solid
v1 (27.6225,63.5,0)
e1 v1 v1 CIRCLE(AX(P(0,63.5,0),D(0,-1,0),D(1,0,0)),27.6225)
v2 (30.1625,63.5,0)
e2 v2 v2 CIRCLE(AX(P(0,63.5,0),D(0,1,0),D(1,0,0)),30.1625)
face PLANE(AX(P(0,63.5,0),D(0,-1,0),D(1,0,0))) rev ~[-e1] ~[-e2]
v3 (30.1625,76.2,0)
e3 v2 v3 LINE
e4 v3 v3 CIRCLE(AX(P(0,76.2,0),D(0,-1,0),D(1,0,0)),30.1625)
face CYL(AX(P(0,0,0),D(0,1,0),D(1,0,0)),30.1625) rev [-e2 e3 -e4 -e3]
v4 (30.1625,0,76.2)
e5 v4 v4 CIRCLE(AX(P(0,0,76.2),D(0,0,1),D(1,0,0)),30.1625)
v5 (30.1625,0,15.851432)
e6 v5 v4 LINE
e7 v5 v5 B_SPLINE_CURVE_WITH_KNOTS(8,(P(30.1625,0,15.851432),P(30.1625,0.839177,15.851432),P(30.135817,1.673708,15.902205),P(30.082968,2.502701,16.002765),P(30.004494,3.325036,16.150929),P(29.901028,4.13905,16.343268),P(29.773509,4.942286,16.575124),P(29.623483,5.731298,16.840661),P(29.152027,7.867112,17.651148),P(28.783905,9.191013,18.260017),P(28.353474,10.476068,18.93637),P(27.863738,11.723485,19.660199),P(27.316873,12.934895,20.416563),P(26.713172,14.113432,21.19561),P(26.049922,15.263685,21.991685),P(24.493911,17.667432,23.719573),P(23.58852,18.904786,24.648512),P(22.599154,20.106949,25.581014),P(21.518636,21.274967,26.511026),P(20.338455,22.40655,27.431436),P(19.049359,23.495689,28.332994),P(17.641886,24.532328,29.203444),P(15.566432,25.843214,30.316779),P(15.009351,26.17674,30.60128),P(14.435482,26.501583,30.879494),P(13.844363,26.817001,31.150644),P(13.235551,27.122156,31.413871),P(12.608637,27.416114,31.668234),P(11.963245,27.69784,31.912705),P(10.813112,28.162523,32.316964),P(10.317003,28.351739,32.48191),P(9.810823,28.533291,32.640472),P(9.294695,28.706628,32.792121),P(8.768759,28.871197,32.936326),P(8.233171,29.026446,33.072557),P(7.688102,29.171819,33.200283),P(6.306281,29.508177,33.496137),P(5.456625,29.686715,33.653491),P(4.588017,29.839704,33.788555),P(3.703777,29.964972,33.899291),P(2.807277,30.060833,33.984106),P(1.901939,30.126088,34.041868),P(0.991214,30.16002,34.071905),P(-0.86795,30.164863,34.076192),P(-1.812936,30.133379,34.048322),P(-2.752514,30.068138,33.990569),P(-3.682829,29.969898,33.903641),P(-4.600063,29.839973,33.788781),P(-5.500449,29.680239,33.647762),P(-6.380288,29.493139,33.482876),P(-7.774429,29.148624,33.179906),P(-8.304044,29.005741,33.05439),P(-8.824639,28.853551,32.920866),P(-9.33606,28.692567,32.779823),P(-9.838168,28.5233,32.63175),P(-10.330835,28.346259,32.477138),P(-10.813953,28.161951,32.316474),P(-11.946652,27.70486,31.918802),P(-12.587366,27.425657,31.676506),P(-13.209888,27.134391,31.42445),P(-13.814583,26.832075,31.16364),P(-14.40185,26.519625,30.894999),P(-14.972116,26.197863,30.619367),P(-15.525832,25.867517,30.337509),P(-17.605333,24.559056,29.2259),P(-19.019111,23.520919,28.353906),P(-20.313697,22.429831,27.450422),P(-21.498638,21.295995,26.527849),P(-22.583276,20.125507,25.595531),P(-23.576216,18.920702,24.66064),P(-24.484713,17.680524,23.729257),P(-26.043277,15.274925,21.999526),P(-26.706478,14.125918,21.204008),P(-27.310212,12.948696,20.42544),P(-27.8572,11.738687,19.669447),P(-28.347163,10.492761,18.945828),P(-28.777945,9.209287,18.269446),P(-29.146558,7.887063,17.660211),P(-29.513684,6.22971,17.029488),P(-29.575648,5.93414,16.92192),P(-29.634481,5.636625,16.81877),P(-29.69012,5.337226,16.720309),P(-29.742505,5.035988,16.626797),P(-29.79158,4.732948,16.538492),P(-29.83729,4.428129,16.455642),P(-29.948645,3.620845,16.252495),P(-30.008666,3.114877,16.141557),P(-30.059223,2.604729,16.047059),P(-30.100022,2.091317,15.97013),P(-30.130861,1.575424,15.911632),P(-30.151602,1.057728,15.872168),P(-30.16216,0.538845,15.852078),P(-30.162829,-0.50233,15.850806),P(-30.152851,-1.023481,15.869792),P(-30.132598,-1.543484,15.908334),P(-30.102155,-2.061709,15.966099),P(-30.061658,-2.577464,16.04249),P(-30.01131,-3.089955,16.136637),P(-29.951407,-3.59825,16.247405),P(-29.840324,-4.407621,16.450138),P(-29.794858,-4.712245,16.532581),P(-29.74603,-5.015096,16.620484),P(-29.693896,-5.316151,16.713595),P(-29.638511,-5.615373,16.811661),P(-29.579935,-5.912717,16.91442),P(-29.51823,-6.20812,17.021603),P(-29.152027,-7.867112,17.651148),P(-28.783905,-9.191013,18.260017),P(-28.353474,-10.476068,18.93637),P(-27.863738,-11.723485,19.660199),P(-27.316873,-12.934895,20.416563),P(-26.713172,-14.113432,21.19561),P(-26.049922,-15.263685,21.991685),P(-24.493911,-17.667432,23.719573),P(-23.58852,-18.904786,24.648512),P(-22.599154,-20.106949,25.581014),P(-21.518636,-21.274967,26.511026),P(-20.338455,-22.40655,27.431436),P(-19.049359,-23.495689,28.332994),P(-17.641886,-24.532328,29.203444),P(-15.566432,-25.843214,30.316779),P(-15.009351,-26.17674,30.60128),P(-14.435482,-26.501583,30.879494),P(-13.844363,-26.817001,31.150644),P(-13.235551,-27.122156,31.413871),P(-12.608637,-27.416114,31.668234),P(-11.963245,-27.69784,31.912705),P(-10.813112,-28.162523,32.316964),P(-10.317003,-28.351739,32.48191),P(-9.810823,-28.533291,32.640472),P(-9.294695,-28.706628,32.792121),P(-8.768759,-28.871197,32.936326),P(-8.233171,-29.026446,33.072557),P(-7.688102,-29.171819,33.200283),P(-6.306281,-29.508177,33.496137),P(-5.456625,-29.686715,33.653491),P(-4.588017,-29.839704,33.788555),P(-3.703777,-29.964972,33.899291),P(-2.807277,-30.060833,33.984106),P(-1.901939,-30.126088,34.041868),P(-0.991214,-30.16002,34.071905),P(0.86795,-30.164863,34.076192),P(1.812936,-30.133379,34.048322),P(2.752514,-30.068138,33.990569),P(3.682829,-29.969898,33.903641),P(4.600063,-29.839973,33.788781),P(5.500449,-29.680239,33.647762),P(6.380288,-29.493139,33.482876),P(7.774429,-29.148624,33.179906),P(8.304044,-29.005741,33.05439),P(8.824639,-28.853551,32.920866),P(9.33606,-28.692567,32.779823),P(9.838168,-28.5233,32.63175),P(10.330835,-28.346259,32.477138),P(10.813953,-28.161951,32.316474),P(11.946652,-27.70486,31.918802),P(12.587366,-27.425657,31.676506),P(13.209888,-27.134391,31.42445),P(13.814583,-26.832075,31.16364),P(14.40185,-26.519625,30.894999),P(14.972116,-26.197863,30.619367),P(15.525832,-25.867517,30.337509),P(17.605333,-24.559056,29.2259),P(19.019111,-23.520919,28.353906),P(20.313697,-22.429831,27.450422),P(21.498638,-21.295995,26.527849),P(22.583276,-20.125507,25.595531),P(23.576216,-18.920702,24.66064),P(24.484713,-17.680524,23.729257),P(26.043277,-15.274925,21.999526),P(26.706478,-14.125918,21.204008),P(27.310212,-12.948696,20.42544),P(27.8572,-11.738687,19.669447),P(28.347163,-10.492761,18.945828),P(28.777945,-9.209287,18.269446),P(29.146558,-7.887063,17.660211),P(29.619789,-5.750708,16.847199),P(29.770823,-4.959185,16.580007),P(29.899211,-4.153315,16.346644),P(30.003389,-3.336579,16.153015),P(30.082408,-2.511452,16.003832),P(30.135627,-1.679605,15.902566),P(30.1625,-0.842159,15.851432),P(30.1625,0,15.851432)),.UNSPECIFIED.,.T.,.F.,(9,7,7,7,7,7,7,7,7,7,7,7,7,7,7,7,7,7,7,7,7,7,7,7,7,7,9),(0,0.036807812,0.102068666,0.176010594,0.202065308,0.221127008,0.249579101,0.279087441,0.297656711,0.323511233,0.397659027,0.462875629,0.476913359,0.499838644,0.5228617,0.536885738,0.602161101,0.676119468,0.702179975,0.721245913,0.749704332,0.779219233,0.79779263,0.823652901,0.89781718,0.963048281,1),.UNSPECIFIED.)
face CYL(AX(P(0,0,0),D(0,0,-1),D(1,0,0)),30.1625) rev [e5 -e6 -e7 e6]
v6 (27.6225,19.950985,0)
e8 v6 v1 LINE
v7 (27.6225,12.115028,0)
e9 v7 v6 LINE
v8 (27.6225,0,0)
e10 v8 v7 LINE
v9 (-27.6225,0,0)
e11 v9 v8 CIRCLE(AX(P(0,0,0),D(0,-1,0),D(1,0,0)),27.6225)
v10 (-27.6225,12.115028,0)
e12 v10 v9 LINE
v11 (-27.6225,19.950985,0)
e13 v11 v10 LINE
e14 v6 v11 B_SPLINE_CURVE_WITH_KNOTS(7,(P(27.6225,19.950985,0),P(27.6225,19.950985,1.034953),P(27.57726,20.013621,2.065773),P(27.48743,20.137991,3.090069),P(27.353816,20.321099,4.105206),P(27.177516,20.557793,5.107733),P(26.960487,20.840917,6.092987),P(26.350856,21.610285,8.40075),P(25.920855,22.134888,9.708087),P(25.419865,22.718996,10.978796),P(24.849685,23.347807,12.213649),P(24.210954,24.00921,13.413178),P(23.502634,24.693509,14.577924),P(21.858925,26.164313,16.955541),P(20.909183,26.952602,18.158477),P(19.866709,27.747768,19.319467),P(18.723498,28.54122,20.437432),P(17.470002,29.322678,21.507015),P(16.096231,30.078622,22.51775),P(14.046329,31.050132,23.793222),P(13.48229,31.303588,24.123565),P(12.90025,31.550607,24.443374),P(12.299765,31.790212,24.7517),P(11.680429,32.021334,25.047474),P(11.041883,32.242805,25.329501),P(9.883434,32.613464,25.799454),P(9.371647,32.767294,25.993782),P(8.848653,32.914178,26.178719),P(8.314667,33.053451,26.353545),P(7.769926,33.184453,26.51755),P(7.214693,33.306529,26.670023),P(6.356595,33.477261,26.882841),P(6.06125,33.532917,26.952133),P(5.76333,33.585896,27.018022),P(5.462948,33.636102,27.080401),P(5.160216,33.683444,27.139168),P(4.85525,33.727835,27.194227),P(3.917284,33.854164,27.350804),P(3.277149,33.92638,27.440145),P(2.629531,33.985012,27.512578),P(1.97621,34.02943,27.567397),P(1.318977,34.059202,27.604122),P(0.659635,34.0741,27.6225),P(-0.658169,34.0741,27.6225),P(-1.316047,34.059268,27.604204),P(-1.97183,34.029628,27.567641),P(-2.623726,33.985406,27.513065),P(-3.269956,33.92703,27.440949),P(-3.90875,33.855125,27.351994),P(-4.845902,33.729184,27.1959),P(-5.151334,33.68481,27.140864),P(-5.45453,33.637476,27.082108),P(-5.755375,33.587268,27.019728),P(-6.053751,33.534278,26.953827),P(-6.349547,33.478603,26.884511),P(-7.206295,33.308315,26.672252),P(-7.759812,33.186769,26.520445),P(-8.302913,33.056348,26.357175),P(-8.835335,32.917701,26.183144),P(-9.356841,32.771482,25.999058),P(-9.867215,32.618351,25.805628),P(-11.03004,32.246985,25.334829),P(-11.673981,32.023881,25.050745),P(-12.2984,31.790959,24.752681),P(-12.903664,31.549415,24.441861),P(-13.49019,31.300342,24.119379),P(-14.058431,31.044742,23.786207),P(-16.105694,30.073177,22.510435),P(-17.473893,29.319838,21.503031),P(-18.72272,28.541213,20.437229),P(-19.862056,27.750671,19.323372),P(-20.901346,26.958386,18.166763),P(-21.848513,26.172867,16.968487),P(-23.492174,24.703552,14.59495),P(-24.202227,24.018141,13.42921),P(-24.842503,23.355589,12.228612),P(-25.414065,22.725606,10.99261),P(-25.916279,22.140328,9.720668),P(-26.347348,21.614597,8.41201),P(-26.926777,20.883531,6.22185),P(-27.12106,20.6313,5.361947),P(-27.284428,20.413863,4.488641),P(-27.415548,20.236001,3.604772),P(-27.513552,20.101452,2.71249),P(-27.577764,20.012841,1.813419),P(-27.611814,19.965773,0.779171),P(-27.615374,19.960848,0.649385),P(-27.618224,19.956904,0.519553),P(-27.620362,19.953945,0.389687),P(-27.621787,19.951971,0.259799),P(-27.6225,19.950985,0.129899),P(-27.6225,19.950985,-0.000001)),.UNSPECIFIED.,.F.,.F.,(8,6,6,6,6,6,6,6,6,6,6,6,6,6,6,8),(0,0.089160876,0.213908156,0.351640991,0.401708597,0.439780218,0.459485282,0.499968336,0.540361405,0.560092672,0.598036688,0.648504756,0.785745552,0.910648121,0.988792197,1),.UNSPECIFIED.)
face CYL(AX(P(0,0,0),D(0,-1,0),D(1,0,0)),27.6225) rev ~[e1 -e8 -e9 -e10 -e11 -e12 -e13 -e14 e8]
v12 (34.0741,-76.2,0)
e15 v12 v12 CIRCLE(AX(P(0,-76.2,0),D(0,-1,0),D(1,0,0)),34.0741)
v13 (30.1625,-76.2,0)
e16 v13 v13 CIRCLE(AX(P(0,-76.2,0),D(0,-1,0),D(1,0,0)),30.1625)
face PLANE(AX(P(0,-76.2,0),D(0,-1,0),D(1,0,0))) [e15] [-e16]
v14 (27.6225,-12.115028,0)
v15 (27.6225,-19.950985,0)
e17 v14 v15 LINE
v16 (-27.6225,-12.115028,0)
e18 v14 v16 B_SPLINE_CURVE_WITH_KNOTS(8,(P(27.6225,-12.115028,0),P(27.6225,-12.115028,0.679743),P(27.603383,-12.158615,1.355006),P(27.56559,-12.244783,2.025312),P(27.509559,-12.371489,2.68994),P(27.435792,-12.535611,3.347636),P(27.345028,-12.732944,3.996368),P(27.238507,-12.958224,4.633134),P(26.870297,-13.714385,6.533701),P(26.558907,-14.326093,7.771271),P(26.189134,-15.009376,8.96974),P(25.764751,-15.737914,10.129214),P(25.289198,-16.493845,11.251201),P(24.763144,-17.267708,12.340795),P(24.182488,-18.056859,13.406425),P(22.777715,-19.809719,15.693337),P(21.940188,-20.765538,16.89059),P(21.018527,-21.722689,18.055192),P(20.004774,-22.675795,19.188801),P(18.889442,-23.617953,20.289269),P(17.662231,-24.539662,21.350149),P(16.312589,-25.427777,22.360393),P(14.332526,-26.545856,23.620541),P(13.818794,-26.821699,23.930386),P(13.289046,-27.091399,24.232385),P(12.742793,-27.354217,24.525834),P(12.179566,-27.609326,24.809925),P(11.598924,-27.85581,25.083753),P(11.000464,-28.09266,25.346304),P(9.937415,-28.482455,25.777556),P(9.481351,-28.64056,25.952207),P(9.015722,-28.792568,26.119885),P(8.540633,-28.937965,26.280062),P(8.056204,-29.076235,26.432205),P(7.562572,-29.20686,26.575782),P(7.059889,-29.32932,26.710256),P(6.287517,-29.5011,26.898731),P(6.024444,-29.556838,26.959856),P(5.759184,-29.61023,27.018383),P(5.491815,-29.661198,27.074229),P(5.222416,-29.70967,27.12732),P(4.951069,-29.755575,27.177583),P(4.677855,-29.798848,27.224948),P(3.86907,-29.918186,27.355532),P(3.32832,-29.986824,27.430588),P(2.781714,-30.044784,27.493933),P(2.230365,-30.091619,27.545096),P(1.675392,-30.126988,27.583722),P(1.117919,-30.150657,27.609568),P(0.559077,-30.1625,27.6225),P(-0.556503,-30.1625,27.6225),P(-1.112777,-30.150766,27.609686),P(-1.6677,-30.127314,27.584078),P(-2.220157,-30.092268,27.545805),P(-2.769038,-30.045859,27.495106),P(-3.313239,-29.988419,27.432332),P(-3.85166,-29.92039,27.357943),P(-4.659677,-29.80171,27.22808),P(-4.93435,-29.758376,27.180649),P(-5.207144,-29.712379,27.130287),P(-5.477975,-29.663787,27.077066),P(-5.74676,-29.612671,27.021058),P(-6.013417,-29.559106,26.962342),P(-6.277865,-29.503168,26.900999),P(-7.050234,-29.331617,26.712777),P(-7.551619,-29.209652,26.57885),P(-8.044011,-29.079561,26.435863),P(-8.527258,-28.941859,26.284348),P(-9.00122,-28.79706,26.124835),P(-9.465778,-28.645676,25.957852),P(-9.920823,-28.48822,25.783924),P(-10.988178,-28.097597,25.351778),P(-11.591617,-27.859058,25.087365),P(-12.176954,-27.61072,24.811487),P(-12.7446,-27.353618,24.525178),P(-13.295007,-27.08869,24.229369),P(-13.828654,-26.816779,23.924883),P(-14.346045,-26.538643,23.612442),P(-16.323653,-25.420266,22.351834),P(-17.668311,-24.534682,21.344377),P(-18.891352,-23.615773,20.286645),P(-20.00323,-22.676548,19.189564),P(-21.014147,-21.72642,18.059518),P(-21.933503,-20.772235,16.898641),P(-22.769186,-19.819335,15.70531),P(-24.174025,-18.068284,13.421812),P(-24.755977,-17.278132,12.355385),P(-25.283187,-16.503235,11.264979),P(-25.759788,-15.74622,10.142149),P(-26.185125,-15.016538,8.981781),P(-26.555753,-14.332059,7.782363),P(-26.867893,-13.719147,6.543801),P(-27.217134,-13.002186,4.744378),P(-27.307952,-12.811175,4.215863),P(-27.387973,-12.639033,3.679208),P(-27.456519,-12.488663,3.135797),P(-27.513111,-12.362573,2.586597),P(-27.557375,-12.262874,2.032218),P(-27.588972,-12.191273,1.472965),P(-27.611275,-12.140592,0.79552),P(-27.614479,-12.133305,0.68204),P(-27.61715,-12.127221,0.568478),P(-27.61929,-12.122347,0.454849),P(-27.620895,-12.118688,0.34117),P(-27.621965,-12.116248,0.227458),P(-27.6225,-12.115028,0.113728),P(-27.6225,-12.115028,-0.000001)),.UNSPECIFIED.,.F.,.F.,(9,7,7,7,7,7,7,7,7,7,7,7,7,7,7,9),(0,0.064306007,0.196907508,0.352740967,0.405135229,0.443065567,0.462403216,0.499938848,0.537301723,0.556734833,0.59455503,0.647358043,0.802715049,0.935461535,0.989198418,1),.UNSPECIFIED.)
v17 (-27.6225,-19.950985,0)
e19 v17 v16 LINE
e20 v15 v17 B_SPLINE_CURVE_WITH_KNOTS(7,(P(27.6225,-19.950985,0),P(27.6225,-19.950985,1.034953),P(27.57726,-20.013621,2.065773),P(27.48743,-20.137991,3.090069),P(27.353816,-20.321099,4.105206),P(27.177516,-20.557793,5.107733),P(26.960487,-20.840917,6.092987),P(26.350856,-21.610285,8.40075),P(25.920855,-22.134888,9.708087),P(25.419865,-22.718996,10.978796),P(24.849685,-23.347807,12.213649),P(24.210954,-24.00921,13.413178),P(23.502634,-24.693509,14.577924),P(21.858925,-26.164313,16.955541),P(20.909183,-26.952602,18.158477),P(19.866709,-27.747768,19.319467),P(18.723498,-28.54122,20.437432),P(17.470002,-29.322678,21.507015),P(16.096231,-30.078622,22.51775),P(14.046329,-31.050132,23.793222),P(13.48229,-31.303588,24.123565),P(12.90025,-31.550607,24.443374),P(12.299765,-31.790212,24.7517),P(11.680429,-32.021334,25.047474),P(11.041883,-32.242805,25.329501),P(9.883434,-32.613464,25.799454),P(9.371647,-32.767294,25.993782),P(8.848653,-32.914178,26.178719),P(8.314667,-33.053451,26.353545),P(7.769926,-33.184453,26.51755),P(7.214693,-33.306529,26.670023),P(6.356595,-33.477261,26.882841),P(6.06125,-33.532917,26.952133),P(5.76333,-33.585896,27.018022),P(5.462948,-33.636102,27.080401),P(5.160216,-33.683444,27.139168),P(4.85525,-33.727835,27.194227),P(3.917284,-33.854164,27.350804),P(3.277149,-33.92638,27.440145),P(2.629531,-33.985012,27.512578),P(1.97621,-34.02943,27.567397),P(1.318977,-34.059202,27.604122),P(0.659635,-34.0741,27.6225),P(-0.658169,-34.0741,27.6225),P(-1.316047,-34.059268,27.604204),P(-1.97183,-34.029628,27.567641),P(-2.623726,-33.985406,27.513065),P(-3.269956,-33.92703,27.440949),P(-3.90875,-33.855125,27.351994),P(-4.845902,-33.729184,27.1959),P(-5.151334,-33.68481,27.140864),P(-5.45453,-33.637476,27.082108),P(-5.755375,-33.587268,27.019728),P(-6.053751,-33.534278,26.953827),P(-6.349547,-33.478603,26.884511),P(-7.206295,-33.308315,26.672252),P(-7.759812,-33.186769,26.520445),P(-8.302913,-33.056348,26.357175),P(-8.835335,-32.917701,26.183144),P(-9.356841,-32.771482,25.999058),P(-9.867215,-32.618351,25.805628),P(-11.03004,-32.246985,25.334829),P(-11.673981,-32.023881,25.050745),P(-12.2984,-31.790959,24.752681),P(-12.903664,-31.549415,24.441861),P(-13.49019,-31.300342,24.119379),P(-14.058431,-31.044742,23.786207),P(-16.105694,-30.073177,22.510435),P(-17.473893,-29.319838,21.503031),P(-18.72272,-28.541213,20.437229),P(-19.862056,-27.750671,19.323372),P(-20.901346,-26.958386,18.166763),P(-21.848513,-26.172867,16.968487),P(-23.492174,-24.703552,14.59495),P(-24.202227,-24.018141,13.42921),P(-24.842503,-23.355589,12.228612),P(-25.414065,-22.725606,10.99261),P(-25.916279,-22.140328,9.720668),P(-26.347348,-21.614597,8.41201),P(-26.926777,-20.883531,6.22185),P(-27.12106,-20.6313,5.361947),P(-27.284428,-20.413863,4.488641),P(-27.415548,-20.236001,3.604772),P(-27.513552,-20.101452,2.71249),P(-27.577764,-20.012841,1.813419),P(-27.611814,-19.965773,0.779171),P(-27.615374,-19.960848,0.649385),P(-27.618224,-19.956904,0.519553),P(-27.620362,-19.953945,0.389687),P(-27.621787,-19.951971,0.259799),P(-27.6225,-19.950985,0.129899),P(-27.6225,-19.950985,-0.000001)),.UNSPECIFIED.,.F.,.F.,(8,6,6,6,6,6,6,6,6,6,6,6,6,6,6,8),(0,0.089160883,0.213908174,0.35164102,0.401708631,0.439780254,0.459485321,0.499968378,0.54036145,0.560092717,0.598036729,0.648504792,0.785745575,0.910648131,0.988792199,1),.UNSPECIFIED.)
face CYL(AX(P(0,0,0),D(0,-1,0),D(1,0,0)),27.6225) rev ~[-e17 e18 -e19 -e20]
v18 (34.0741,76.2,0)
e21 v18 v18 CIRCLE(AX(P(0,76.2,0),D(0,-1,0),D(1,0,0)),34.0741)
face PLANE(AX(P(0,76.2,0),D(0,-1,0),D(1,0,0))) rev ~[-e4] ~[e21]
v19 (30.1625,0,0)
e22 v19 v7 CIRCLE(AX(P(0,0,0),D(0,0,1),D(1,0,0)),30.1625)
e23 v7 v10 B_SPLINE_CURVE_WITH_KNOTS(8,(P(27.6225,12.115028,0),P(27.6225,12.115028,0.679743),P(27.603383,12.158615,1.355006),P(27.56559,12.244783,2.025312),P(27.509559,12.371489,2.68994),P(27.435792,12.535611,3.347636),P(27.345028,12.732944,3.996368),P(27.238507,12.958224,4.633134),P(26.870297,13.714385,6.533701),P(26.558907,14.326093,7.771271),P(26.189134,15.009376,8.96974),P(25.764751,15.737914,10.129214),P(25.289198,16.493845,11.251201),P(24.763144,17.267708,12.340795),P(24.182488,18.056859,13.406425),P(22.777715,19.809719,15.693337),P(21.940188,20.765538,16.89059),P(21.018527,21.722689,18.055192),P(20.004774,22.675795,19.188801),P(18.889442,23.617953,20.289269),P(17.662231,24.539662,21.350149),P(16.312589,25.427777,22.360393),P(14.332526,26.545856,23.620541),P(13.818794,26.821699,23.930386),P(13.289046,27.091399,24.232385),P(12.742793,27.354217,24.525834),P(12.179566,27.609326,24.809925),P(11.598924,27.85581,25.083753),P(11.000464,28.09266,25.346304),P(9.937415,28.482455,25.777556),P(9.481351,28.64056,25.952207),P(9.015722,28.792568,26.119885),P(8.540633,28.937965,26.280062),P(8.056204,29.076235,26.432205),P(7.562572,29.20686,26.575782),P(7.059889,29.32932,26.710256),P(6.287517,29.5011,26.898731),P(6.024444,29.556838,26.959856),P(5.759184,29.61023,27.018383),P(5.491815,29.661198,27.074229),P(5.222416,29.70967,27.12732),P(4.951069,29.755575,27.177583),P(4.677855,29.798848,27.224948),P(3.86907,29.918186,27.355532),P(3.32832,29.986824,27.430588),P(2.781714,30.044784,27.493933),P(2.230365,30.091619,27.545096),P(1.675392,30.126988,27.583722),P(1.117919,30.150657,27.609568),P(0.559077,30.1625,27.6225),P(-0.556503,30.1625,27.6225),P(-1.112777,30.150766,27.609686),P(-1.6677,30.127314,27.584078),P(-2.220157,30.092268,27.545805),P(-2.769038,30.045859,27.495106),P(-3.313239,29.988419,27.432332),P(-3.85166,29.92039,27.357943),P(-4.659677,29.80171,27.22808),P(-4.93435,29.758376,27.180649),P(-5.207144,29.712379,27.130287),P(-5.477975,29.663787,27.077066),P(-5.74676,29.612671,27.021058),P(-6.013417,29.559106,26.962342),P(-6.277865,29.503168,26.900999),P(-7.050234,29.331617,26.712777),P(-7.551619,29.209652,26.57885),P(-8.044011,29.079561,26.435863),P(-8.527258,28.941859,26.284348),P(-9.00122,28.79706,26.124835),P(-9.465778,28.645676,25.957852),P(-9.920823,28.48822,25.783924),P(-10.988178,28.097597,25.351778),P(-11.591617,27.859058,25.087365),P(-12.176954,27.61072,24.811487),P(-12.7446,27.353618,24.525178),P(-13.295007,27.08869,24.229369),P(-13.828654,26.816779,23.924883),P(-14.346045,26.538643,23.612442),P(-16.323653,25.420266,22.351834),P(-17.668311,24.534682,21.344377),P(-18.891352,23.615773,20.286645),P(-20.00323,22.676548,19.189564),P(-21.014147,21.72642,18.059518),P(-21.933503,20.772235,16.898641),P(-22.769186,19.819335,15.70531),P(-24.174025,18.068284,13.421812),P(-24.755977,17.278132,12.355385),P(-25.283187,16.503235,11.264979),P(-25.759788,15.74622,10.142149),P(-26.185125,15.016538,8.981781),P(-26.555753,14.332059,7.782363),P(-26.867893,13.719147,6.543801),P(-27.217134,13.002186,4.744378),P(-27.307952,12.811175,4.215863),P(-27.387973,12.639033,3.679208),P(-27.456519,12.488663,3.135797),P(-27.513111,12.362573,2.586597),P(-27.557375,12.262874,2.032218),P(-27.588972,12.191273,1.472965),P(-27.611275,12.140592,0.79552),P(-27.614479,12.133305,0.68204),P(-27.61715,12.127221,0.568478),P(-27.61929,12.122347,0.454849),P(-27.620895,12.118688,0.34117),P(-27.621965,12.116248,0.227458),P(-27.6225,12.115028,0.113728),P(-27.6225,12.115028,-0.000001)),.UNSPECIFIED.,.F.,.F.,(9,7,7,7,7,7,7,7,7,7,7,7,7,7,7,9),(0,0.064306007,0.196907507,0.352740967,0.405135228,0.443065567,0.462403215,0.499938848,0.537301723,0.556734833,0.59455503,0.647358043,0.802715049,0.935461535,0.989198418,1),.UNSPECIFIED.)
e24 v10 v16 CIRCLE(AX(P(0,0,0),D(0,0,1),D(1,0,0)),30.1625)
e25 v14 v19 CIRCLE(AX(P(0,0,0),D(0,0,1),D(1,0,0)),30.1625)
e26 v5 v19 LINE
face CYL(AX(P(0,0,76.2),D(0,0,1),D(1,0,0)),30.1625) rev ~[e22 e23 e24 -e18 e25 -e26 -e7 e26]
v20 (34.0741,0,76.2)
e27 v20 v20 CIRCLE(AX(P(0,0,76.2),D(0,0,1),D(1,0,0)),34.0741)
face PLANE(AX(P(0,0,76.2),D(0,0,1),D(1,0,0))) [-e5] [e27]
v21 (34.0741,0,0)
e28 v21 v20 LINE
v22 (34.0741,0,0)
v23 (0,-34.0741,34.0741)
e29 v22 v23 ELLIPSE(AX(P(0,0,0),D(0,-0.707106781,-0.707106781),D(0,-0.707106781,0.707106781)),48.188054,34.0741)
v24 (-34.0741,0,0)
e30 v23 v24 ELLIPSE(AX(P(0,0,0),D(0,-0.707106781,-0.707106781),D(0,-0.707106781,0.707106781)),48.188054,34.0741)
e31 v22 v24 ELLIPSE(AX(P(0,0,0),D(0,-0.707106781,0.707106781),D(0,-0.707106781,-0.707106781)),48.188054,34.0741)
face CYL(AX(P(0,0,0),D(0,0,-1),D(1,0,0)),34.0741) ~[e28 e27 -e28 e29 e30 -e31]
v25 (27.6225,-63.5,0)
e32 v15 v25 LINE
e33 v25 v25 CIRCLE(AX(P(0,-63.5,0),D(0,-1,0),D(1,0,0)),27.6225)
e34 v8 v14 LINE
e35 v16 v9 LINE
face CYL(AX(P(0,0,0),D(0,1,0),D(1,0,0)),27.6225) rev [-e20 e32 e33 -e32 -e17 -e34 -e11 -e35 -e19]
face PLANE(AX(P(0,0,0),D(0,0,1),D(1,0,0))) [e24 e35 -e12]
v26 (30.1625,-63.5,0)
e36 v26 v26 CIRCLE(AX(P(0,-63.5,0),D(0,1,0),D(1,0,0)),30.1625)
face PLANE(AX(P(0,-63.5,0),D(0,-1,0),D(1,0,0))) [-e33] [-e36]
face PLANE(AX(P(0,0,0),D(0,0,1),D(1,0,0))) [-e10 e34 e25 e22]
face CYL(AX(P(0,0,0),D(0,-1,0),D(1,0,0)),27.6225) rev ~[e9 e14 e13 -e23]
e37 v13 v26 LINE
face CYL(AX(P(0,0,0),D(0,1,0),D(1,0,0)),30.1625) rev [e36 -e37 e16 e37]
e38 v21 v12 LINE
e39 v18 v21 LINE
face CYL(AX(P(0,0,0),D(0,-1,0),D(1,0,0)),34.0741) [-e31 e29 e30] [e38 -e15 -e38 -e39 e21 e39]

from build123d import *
from build123d import SkipClean  # not in build123d's __all__

# Parameters (mm, degrees)
F0_R     = 34.0741
F0_R_2   = 30.1625
F1_DEPTH = 76.2
F2_R     = 34.0741
F2_R_2   = 30.1625
F3_DEPTH = 76.2
F4_R     = 34.0741
F4_R_2   = 27.6225
F5_DEPTH = 63.5
F6_R     = 30.1625
F7_DEPTH = 76.2
F8_R     = 27.6225
F9_DEPTH = 143.6


with BuildPart() as f1:
    # F0 (on Front) → F1 (new body, symmetric)
    with BuildSketch(Plane.XZ):
        Circle(F0_R)
        Circle(F0_R_2, mode=Mode.SUBTRACT)
    extrude(amount=F1_DEPTH, both=True)

    # F2 (on Top) → F3 (join)
    with BuildSketch(Plane.XY):
        Circle(F2_R)
        Circle(F2_R_2, mode=Mode.SUBTRACT)
    extrude(amount=F3_DEPTH)

    # F4 (on Front) → F5 (join, symmetric)
    with BuildSketch(Plane.XZ):
        Circle(F4_R)
        Circle(F4_R_2, mode=Mode.SUBTRACT)
    with SkipClean():  # cleaning this boolean's faces spoils the solid; the shape is the same uncleaned
        extrude(amount=F5_DEPTH, both=True)

    # F6 (on face) → F7 (cut, through all)
    with BuildSketch(Plane.XY.offset(76.2)):
        Circle(F6_R)
    extrude(amount=-F7_DEPTH, mode=Mode.SUBTRACT)

    # F8 (on Front) → F9 (cut, symmetric)
    with BuildSketch(Plane.XZ):
        Circle(F8_R)
    extrude(amount=F9_DEPTH, both=True, mode=Mode.SUBTRACT)


solid = f1.part
